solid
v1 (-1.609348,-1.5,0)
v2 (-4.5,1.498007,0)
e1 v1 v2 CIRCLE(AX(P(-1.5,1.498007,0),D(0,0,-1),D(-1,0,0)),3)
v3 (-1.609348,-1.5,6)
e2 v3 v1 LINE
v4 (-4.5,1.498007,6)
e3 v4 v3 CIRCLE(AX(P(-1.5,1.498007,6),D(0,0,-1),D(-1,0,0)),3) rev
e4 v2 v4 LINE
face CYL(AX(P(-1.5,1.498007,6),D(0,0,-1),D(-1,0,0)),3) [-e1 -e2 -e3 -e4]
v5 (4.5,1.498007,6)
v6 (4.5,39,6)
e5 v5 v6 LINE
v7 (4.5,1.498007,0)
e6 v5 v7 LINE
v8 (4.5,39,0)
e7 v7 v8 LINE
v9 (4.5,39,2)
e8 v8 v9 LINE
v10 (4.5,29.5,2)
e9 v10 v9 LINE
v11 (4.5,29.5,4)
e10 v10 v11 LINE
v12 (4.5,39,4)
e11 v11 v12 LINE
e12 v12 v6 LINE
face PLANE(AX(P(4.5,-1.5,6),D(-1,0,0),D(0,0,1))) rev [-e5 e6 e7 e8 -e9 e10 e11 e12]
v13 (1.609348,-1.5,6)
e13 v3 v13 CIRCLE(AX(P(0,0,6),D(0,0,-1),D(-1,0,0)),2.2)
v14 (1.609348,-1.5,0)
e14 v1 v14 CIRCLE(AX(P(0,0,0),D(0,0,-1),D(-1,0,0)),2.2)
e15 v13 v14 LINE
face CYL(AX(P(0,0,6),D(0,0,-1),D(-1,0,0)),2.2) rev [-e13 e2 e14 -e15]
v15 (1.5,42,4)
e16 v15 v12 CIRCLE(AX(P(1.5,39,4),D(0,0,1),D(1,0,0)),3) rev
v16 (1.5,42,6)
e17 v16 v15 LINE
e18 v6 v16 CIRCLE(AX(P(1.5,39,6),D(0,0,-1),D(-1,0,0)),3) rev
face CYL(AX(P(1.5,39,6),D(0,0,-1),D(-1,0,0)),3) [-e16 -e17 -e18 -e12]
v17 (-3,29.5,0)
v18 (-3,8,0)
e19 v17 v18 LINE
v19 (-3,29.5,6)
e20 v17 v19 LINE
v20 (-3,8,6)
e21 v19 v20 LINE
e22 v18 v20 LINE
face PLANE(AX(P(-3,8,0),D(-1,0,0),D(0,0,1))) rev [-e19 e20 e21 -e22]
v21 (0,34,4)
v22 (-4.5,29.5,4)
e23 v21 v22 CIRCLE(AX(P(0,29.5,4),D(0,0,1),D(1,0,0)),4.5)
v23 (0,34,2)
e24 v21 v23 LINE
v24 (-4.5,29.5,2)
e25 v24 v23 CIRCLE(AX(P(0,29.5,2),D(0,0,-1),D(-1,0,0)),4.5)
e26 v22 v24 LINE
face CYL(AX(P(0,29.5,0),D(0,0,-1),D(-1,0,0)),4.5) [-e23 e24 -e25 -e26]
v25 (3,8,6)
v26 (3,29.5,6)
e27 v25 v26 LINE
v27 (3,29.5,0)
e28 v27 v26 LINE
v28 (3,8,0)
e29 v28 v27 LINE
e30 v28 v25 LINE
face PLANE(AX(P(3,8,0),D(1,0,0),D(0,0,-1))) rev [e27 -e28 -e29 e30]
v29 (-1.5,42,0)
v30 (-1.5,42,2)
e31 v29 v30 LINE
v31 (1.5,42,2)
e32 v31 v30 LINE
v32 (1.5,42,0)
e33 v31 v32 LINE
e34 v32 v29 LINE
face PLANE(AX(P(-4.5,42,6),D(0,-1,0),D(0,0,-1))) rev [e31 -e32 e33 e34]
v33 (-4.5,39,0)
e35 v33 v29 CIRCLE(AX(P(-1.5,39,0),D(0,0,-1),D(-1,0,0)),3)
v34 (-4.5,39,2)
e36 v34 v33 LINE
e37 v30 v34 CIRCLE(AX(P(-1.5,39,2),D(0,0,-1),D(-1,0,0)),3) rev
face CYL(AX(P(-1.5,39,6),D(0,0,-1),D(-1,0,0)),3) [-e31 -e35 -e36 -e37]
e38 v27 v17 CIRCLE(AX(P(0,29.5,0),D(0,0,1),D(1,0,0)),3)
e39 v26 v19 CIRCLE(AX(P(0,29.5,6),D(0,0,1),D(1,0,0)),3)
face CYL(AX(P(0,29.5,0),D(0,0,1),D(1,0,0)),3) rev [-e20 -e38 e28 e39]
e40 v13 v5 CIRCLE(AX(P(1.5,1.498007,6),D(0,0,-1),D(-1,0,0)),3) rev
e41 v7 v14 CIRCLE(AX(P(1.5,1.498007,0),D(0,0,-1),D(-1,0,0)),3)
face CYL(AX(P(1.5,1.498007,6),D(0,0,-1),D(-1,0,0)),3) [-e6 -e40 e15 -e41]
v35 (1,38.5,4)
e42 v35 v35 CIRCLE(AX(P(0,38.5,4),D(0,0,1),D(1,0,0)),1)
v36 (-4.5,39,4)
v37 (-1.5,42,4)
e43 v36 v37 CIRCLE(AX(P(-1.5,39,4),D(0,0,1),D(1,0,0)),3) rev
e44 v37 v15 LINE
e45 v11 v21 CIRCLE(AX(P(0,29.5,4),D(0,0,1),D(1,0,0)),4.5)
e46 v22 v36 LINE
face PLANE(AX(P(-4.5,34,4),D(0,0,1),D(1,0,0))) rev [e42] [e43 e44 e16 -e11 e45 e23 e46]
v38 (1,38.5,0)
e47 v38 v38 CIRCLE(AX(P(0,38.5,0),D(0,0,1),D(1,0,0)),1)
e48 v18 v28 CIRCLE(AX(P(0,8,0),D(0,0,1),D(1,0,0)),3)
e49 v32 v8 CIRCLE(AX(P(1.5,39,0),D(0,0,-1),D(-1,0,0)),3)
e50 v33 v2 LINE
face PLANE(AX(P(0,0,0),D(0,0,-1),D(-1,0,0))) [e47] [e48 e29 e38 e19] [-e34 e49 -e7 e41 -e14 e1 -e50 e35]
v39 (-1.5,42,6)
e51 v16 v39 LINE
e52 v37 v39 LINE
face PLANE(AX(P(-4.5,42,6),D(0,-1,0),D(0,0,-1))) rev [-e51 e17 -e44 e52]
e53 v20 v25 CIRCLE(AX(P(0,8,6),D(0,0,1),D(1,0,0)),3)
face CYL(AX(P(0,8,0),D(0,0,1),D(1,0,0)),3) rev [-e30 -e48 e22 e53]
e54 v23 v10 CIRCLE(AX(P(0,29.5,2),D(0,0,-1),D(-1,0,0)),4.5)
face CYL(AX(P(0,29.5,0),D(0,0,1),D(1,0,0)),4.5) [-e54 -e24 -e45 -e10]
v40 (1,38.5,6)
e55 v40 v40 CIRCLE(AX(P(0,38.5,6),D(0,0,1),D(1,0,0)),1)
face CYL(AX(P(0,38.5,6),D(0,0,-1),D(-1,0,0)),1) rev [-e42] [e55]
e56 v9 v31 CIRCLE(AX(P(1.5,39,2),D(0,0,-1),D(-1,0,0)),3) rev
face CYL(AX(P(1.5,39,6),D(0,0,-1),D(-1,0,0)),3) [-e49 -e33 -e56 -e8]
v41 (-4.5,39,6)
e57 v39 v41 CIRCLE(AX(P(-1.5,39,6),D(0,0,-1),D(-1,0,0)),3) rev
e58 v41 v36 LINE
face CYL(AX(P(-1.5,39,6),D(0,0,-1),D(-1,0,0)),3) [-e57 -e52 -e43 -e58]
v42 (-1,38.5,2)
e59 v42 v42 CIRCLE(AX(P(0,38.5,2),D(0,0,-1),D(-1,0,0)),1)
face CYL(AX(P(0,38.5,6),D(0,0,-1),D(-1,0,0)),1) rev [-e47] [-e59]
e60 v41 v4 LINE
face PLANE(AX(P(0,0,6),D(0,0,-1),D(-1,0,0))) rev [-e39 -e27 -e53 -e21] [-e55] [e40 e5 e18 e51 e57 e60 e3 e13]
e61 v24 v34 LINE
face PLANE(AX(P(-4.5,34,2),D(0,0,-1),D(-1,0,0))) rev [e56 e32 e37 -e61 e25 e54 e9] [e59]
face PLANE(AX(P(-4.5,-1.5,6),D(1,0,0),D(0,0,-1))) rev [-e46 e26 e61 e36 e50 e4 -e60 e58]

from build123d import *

# Parameters (mm, degrees)
CROQUIS1_R              = 1
SALIENTE_EXTRUIR1_DEPTH = 6
CROQUIS2_W              = 9
CROQUIS2_H              = 2
CORTAR_EXTRUIR1_DEPTH   = 8
REDONDEO1_R             = 4.5
REDONDEO2_R             = 3
CORTAR_EXTRUIR2_DEPTH   = 43.66438796


# Some blends are built 0.0001 mm under size
with BuildPart() as part:
    # Croquis1 → Saliente-Extruir1 (new body)
    with BuildSketch(Plane.XY):
        with BuildLine():
            Line((-4.5, -1.5), (-1.609347694, -1.5))
            ThreePointArc((-1.609347694, -1.5), (0, 2.2), (1.609347694, -1.5))
            Line((1.609347694, -1.5), (4.5, -1.5))
            Line((4.5, -1.5), (4.5, 42))
            Line((4.5, 42), (-4.5, 42))
            Line((-4.5, 42), (-4.5, -1.5))
        make_face()
        with Locations((0, 38.5)):
            Circle(CROQUIS1_R, mode=Mode.SUBTRACT)
    extrude(amount=SALIENTE_EXTRUIR1_DEPTH)

    # Croquis2 → Cortar-Extruir1 (cut)
    with BuildSketch(Plane(origin=(0, 42, 0), x_dir=(1, 0, 0), z_dir=(0, 1, 0))):
        with Locations((0, -3)):
            Rectangle(CROQUIS2_W, CROQUIS2_H)
    extrude(amount=-CORTAR_EXTRUIR1_DEPTH, mode=Mode.SUBTRACT)

    # Redondeo1
    redondeo1_edges = [part.edges().sort_by_distance(p)[0] for p in [
        (-4.5, 34, 3),
        (4.5, 34, 3),
    ]]
    fillet(redondeo1_edges, radius=REDONDEO1_R - 0.0001)  # a hair under: the kernel refuses the full size

    # Redondeo2
    # the kernel refuses this fillet: 3 mm, written as the material it takes off along each edge
    with BuildSketch(Plane(origin=(-4.5, 42, -3.5), x_dir=(0, -1, 0), z_dir=(0, 0, 1)), Plane(origin=(-4.5, 42, -7.5), x_dir=(0, -1, 0), z_dir=(0, 0, 1))) as redondeo2_piece_1:
        with BuildLine():
            CenterArc((REDONDEO2_R, REDONDEO2_R), REDONDEO2_R, 180, 90)
            Line((0, REDONDEO2_R), (-REDONDEO2_R * 0.02, REDONDEO2_R))
            Line((-REDONDEO2_R * 0.02, REDONDEO2_R), (-REDONDEO2_R * 0.02, -REDONDEO2_R * 0.02))
            Line((-REDONDEO2_R * 0.02, -REDONDEO2_R * 0.02), (REDONDEO2_R, -REDONDEO2_R * 0.02))
            Line((REDONDEO2_R, -REDONDEO2_R * 0.02), (REDONDEO2_R, 0))
        make_face()
    extrude(amount=17, mode=Mode.SUBTRACT)
    with BuildSketch(Plane(origin=(4.5, 42, -7.5), x_dir=(0, -1, 0), z_dir=(0, 0, 1)), Plane(origin=(4.5, 42, -3.5), x_dir=(0, -1, 0), z_dir=(0, 0, 1))) as redondeo2_piece_2:
        with BuildLine():
            CenterArc((REDONDEO2_R, -REDONDEO2_R), REDONDEO2_R, 90, 90)
            Line((0, -REDONDEO2_R), (-REDONDEO2_R * 0.02, -REDONDEO2_R))
            Line((-REDONDEO2_R * 0.02, -REDONDEO2_R), (-REDONDEO2_R * 0.02, REDONDEO2_R * 0.02))
            Line((-REDONDEO2_R * 0.02, REDONDEO2_R * 0.02), (REDONDEO2_R, REDONDEO2_R * 0.02))
            Line((REDONDEO2_R, REDONDEO2_R * 0.02), (REDONDEO2_R, 0))
        make_face()
    extrude(amount=17, mode=Mode.SUBTRACT)
    with BuildSketch(Plane(origin=(4.5, -1.5, -7.495016295), x_dir=(0, 1, 0), z_dir=(0, 0, 1))) as redondeo2_piece_3:
        with BuildLine():
            CenterArc((2.998006518, 3), REDONDEO2_R, 182.088849817, 87.911150183)
            Line((0, 2.890652306), (-0.05996013, 2.888465352))
            ThreePointArc((-0.05996013, 2.888465352), (-0.06, 1.445326153), (-0.06, 0))
            Line((-0.06, 0), (0, -0.06))
            Line((0, -0.06), (2.998006518, -0.06))
            Line((2.998006518, -0.06), (2.998006518, 0))
        make_face()
    extrude(amount=20.99003259, mode=Mode.SUBTRACT)
    with BuildSketch(Plane(origin=(-4.5, -1.5, -7.495016295), x_dir=(0, 1, 0), z_dir=(0, 0, 1))) as redondeo2_piece_4:
        with BuildLine():
            CenterArc((2.998006518, -3), REDONDEO2_R, 90, 87.911150183)
            Line((0, -2.890652306), (-0.05996013, -2.888465352))
            ThreePointArc((-0.05996013, -2.888465352), (-0.06, -1.445326153), (-0.06, 0))
            Line((-0.06, 0), (0, 0.06))
            Line((0, 0.06), (2.998006518, 0.06))
            Line((2.998006518, 0.06), (2.998006518, 0))
        make_face()
    extrude(amount=20.99003259, mode=Mode.SUBTRACT)

    # Croquis3 → Cortar-Extruir2 (cut, through all)
    with BuildSketch(Plane.XY.offset(6)):
        with BuildLine():
            Line((-3, 8), (-3, 29.5))
            ThreePointArc((-3, 29.5), (0, 32.5), (3, 29.5))
            Line((3, 29.5), (3, 8))
            ThreePointArc((3, 8), (0, 5), (-3, 8))
        make_face()
    extrude(amount=-CORTAR_EXTRUIR2_DEPTH, mode=Mode.SUBTRACT)


solid = part.part
